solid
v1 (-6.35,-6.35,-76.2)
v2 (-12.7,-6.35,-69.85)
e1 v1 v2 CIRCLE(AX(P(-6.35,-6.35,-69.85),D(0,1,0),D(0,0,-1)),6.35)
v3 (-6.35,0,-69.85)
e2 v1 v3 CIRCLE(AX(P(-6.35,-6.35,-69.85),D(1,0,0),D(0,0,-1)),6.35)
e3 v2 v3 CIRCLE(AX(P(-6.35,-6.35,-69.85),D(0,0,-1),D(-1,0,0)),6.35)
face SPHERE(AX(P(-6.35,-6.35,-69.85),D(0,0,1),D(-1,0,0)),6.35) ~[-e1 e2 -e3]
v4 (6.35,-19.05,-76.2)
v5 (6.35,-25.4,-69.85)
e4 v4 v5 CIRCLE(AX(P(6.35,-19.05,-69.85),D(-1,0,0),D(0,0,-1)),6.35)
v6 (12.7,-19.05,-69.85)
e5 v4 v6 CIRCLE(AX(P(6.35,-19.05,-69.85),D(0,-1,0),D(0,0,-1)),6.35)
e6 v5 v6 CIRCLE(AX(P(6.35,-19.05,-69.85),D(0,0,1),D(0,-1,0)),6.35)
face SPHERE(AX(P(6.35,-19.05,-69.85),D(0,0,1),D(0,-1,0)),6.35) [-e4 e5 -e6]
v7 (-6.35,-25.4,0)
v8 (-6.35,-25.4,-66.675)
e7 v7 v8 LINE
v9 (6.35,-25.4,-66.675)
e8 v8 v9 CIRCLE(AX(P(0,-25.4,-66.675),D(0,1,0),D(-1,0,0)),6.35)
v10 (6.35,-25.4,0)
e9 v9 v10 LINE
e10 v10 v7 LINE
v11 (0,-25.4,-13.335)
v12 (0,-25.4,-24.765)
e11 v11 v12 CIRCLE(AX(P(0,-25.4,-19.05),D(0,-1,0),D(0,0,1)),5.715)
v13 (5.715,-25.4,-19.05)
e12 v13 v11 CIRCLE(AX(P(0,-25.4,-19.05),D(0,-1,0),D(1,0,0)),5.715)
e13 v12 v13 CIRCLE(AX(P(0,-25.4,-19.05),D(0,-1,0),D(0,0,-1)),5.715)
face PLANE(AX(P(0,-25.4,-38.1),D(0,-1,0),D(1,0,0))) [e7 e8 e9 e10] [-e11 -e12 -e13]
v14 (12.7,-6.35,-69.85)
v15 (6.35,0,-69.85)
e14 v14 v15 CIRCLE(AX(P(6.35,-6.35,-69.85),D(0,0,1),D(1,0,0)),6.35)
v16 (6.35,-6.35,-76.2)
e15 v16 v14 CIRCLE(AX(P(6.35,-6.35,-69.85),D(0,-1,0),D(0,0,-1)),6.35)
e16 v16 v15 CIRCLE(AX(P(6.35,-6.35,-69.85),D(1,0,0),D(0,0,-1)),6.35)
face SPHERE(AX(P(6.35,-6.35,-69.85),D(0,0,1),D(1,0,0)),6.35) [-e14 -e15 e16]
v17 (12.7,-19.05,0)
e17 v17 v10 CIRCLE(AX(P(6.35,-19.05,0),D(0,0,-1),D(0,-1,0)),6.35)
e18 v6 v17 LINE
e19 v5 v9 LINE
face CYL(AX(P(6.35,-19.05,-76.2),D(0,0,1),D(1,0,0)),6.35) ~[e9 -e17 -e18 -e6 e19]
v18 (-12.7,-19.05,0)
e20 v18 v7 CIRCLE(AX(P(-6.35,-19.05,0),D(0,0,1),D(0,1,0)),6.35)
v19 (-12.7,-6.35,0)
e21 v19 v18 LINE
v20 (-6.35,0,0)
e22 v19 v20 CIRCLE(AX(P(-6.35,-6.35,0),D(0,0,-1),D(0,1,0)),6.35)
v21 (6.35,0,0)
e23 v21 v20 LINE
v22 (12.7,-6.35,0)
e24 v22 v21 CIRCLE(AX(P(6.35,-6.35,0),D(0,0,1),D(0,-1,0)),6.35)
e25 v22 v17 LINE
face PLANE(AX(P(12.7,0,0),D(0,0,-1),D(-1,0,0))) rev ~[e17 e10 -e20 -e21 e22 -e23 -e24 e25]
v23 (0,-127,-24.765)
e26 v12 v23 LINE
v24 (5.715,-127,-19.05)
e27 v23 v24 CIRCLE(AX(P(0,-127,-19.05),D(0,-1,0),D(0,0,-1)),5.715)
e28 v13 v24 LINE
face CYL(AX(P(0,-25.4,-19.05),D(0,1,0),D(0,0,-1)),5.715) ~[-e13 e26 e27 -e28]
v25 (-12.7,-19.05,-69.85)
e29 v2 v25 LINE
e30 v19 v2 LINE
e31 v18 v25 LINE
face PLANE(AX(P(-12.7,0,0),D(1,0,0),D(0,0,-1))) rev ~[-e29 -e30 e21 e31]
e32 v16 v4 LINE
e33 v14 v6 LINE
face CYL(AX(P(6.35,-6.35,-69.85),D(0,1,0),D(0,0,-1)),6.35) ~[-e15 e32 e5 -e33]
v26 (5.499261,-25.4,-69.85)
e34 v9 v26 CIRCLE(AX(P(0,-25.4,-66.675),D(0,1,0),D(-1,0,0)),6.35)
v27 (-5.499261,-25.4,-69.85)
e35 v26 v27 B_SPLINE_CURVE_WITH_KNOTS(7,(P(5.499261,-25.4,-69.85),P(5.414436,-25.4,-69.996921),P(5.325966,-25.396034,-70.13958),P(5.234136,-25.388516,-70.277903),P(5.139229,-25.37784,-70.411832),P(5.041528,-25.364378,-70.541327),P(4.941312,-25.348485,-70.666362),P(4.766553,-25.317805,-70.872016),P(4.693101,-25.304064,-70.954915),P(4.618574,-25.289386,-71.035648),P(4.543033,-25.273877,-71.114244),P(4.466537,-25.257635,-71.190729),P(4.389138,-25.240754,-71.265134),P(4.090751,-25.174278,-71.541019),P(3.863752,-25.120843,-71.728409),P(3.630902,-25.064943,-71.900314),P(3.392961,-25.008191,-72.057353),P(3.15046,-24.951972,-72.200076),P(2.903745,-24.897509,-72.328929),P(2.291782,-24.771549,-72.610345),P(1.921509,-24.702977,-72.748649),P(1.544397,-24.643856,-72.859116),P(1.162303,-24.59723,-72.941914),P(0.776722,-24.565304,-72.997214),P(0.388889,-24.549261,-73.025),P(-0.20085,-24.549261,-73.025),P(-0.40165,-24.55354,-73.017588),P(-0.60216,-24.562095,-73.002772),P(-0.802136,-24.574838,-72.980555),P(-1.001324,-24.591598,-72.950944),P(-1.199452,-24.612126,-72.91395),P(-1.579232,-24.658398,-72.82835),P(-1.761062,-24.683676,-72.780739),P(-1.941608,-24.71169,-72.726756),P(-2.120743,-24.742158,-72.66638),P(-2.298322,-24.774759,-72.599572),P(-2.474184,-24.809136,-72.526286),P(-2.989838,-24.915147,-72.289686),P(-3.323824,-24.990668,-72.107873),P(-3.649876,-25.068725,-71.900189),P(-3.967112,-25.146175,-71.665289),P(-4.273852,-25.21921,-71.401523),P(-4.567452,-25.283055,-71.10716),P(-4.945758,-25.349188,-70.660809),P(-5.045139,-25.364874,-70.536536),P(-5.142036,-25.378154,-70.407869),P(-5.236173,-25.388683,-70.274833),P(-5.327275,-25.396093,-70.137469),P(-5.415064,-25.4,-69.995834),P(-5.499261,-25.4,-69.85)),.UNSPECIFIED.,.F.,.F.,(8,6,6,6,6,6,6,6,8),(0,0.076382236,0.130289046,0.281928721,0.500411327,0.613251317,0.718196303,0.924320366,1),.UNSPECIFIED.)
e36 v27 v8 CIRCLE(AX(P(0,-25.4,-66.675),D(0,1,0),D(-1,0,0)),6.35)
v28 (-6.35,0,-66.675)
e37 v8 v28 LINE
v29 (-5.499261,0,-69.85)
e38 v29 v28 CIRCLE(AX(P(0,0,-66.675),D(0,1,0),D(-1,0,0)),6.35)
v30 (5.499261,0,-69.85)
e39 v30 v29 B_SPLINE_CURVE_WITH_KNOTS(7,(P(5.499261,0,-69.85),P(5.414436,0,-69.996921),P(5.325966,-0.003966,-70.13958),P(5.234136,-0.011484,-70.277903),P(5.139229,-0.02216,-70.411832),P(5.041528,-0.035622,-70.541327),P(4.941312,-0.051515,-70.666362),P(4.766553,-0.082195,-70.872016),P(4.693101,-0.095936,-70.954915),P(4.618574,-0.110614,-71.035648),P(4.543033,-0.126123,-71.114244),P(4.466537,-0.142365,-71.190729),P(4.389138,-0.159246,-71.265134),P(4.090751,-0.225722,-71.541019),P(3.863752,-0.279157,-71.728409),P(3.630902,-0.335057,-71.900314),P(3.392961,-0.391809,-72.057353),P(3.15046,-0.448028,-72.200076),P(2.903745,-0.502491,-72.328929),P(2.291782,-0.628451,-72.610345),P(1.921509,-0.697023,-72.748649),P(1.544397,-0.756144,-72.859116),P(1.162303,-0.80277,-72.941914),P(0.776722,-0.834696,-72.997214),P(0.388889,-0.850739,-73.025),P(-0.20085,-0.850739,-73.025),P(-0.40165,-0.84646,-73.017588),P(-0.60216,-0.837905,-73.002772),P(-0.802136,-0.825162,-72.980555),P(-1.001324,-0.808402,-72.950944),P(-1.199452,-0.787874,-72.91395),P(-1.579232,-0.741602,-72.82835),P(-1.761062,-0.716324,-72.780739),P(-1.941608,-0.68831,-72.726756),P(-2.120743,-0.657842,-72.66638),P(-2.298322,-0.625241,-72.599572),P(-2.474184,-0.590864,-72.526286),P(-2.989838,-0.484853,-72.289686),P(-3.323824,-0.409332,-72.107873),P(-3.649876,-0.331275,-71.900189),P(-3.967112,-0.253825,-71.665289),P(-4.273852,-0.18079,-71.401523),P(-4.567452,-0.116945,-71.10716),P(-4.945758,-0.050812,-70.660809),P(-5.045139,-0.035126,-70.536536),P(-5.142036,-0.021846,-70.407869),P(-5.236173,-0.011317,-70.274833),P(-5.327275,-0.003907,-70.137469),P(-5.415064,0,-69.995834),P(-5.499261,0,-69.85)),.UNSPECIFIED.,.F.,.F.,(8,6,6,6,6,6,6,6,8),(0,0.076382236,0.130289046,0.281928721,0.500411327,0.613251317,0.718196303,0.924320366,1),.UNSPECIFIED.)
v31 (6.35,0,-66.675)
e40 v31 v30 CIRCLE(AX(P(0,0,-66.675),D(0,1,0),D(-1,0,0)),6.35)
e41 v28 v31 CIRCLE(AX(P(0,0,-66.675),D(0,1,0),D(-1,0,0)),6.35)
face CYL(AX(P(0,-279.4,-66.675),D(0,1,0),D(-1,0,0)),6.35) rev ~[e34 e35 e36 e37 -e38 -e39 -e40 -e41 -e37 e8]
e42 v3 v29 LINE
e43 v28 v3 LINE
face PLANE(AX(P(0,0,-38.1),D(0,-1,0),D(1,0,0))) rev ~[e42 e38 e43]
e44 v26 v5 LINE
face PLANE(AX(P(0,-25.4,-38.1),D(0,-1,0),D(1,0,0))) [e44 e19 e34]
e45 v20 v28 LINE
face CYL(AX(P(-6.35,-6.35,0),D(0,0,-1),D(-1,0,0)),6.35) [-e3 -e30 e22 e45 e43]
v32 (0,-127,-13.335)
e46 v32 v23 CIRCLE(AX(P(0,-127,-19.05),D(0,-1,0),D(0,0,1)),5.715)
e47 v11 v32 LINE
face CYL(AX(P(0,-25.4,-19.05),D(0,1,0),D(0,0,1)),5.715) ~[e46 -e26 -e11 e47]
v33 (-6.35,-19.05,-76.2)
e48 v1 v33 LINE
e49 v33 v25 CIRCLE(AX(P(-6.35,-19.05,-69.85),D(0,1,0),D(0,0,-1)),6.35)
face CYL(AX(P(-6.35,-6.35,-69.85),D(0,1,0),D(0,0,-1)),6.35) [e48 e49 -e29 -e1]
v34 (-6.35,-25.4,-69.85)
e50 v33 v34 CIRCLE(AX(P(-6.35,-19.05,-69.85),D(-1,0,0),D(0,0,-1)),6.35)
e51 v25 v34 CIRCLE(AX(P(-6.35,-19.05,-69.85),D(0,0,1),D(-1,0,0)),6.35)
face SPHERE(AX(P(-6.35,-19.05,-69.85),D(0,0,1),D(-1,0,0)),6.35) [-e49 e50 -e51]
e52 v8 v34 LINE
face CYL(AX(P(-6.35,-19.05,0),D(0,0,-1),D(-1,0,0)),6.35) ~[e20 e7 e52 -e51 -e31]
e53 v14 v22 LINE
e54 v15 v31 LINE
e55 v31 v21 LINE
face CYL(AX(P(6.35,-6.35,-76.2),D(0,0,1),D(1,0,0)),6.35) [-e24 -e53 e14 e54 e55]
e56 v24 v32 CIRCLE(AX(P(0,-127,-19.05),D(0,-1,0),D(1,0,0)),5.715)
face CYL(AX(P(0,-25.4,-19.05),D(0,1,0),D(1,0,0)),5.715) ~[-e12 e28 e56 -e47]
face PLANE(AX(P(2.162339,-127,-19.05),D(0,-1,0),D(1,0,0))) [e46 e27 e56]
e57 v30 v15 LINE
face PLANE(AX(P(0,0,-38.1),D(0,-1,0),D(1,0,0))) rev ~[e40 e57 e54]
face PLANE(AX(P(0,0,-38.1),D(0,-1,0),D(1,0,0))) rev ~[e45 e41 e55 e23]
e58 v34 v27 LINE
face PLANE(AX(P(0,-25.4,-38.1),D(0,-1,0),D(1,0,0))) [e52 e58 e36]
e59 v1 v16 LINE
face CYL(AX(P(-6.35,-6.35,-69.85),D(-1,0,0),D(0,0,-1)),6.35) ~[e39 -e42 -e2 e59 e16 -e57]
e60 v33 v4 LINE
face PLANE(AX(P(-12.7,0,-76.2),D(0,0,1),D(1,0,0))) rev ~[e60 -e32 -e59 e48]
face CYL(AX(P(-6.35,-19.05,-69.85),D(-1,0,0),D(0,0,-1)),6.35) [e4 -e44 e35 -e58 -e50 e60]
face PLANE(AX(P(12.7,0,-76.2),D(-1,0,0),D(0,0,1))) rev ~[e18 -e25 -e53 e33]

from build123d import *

# Parameters (mm, degrees)
F1_DEPTH     = 25.4
F3_DEPTH     = 101.6
F4_R         = 6.35
F6_D         = 12.7
F6_DEPTH     = 254
F6_TIP       = 3.8154649308
F7_T1_DEPTH  = 12.7
F7_T3_DEPTH  = 12.7
F7_T6_ANGLE  = 90
F7_T8_ANGLE  = 90
F7_T10_ANGLE = 90
F7_T12_ANGLE = 90


# Not quite as in the source:
# - a fillet or chamfer that OpenCascade refuses, or shapes differently, is made with other operations: its cross-section is extruded or revolved along the edge and cut away or added


with BuildPart() as f1:
    # F0 (on Front) → F1 (new body)
    with BuildSketch(Plane.XZ):
        Polygon((-12.7, -76.2), (0, -76.2), (12.7, -76.2), (12.7, 0), (-12.7, 0), align=None)
    extrude(amount=F1_DEPTH)

    # F2 (on face) → F3 (join)
    with BuildSketch(Plane.XZ.offset(25.4)):
        with BuildLine():
            ThreePointArc((5.715, -19.05), (4.0411152545, -15.0088847455), (0, -13.335))
            Line((0, -13.335), (0, -19.05))
            Line((0, -19.05), (0, -24.765))
            ThreePointArc((0, -24.765), (4.0411152545, -23.0911152545), (5.715, -19.05))
        make_face()
        with BuildLine():
            Line((0, -19.05), (0, -13.335))
            ThreePointArc((0, -13.335), (-5.715, -19.05), (0, -24.765))
            Line((0, -24.765), (0, -19.05))
        make_face()
    extrude(amount=F3_DEPTH)

    # F4
    f4_edges = [f1.edges().sort_by_distance(p)[0] for p in [
        (12.7, -25.4, -38.1),
        (12.7, 0, -38.1),
        (-12.7, -25.4, -38.1),
        (-12.7, 0, -38.1),
    ]]
    fillet(f4_edges, radius=F4_R)

    # F6
    with Locations(Plane.XZ.offset(25.4)):
        with Locations((0, -66.675)):
            Hole(F6_D / 2, depth=F6_DEPTH)
            with Locations((0, 0, -(F6_DEPTH + F6_TIP / 2))):  # 118° drill point
                Cone(0, F6_D / 2, F6_TIP, mode=Mode.SUBTRACT)

    # F7: fillet of radius 6.35 on 6 edges, made by hand

    # F7_s2 → F7_t1 (cut)
    with BuildSketch(Plane.XZ.offset(6.35)):
        with BuildLine():
            ThreePointArc((6.35, -76.2), (10.8401280605, -74.3401280605), (12.7, -69.85))
            Line((12.7, -69.85), (12.7, -76.2))
            Line((12.7, -76.2), (6.35, -76.2))
        make_face()
        with BuildLine():
            ThreePointArc((-6.35, -76.2), (-10.8401280605, -74.3401280605), (-12.7, -69.85))
            Line((-12.7, -69.85), (-12.7, -76.2))
            Line((-12.7, -76.2), (-6.35, -76.2))
        make_face()
    extrude(amount=F7_T1_DEPTH, mode=Mode.SUBTRACT)

    # F7_s4 → F7_t3 (cut)
    with BuildSketch(Plane.YZ.offset(-6.35)):
        with BuildLine():
            ThreePointArc((-19.05, -76.2), (-23.5401280605, -74.3401280605), (-25.4, -69.85))
            Line((-25.4, -69.85), (-25.4, -76.2))
            Line((-25.4, -76.2), (-19.05, -76.2))
        make_face()
        with BuildLine():
            ThreePointArc((-6.35, -76.2), (-1.8598719395, -74.3401280605), (0, -69.85))
            Line((0, -69.85), (0, -76.2))
            Line((0, -76.2), (-6.35, -76.2))
        make_face()
    extrude(amount=F7_T3_DEPTH, mode=Mode.SUBTRACT)

    # F7_s5 → F7_t6 (revolve, cut)
    with BuildSketch(Plane.XZ.offset(6.35)):
        with BuildLine():
            ThreePointArc((-6.35, -76.2), (-10.8401280605, -74.3401280605), (-12.7, -69.85))
            Line((-12.7, -69.85), (-12.7, -76.2))
            Line((-12.7, -76.2), (-6.35, -76.2))
        make_face()
    revolve(axis=Axis((-6.35, -6.35, -76.2), (0, 0, -1)), revolution_arc=F7_T6_ANGLE, mode=Mode.SUBTRACT)

    # F7_s7 → F7_t8 (revolve, cut)
    with BuildSketch(Plane.XZ.offset(19.05)):
        with BuildLine():
            ThreePointArc((-6.35, -76.2), (-10.8401280605, -74.3401280605), (-12.7, -69.85))
            Line((-12.7, -69.85), (-12.7, -76.2))
            Line((-12.7, -76.2), (-6.35, -76.2))
        make_face()
    revolve(axis=Axis((-6.35, -19.05, -76.2), (0, 0, 1)), revolution_arc=F7_T8_ANGLE, mode=Mode.SUBTRACT)

    # F7_s9 → F7_t10 (revolve, cut)
    with BuildSketch(Plane.XZ.offset(6.35)):
        with BuildLine():
            ThreePointArc((6.35, -76.2), (10.8401280605, -74.3401280605), (12.7, -69.85))
            Line((12.7, -69.85), (12.7, -76.2))
            Line((12.7, -76.2), (6.35, -76.2))
        make_face()
    revolve(axis=Axis((6.35, -6.35, -76.2), (0, 0, 1)), revolution_arc=F7_T10_ANGLE, mode=Mode.SUBTRACT)

    # F7_s11 → F7_t12 (revolve, cut)
    with BuildSketch(Plane.YZ.offset(6.35)):
        with BuildLine():
            ThreePointArc((-19.05, -76.2), (-23.5401280605, -74.3401280605), (-25.4, -69.85))
            Line((-25.4, -69.85), (-25.4, -76.2))
            Line((-25.4, -76.2), (-19.05, -76.2))
        make_face()
    revolve(axis=Axis((6.35, -19.05, -76.2), (0, 0, 1)), revolution_arc=F7_T12_ANGLE, mode=Mode.SUBTRACT)


solid = f1.part
